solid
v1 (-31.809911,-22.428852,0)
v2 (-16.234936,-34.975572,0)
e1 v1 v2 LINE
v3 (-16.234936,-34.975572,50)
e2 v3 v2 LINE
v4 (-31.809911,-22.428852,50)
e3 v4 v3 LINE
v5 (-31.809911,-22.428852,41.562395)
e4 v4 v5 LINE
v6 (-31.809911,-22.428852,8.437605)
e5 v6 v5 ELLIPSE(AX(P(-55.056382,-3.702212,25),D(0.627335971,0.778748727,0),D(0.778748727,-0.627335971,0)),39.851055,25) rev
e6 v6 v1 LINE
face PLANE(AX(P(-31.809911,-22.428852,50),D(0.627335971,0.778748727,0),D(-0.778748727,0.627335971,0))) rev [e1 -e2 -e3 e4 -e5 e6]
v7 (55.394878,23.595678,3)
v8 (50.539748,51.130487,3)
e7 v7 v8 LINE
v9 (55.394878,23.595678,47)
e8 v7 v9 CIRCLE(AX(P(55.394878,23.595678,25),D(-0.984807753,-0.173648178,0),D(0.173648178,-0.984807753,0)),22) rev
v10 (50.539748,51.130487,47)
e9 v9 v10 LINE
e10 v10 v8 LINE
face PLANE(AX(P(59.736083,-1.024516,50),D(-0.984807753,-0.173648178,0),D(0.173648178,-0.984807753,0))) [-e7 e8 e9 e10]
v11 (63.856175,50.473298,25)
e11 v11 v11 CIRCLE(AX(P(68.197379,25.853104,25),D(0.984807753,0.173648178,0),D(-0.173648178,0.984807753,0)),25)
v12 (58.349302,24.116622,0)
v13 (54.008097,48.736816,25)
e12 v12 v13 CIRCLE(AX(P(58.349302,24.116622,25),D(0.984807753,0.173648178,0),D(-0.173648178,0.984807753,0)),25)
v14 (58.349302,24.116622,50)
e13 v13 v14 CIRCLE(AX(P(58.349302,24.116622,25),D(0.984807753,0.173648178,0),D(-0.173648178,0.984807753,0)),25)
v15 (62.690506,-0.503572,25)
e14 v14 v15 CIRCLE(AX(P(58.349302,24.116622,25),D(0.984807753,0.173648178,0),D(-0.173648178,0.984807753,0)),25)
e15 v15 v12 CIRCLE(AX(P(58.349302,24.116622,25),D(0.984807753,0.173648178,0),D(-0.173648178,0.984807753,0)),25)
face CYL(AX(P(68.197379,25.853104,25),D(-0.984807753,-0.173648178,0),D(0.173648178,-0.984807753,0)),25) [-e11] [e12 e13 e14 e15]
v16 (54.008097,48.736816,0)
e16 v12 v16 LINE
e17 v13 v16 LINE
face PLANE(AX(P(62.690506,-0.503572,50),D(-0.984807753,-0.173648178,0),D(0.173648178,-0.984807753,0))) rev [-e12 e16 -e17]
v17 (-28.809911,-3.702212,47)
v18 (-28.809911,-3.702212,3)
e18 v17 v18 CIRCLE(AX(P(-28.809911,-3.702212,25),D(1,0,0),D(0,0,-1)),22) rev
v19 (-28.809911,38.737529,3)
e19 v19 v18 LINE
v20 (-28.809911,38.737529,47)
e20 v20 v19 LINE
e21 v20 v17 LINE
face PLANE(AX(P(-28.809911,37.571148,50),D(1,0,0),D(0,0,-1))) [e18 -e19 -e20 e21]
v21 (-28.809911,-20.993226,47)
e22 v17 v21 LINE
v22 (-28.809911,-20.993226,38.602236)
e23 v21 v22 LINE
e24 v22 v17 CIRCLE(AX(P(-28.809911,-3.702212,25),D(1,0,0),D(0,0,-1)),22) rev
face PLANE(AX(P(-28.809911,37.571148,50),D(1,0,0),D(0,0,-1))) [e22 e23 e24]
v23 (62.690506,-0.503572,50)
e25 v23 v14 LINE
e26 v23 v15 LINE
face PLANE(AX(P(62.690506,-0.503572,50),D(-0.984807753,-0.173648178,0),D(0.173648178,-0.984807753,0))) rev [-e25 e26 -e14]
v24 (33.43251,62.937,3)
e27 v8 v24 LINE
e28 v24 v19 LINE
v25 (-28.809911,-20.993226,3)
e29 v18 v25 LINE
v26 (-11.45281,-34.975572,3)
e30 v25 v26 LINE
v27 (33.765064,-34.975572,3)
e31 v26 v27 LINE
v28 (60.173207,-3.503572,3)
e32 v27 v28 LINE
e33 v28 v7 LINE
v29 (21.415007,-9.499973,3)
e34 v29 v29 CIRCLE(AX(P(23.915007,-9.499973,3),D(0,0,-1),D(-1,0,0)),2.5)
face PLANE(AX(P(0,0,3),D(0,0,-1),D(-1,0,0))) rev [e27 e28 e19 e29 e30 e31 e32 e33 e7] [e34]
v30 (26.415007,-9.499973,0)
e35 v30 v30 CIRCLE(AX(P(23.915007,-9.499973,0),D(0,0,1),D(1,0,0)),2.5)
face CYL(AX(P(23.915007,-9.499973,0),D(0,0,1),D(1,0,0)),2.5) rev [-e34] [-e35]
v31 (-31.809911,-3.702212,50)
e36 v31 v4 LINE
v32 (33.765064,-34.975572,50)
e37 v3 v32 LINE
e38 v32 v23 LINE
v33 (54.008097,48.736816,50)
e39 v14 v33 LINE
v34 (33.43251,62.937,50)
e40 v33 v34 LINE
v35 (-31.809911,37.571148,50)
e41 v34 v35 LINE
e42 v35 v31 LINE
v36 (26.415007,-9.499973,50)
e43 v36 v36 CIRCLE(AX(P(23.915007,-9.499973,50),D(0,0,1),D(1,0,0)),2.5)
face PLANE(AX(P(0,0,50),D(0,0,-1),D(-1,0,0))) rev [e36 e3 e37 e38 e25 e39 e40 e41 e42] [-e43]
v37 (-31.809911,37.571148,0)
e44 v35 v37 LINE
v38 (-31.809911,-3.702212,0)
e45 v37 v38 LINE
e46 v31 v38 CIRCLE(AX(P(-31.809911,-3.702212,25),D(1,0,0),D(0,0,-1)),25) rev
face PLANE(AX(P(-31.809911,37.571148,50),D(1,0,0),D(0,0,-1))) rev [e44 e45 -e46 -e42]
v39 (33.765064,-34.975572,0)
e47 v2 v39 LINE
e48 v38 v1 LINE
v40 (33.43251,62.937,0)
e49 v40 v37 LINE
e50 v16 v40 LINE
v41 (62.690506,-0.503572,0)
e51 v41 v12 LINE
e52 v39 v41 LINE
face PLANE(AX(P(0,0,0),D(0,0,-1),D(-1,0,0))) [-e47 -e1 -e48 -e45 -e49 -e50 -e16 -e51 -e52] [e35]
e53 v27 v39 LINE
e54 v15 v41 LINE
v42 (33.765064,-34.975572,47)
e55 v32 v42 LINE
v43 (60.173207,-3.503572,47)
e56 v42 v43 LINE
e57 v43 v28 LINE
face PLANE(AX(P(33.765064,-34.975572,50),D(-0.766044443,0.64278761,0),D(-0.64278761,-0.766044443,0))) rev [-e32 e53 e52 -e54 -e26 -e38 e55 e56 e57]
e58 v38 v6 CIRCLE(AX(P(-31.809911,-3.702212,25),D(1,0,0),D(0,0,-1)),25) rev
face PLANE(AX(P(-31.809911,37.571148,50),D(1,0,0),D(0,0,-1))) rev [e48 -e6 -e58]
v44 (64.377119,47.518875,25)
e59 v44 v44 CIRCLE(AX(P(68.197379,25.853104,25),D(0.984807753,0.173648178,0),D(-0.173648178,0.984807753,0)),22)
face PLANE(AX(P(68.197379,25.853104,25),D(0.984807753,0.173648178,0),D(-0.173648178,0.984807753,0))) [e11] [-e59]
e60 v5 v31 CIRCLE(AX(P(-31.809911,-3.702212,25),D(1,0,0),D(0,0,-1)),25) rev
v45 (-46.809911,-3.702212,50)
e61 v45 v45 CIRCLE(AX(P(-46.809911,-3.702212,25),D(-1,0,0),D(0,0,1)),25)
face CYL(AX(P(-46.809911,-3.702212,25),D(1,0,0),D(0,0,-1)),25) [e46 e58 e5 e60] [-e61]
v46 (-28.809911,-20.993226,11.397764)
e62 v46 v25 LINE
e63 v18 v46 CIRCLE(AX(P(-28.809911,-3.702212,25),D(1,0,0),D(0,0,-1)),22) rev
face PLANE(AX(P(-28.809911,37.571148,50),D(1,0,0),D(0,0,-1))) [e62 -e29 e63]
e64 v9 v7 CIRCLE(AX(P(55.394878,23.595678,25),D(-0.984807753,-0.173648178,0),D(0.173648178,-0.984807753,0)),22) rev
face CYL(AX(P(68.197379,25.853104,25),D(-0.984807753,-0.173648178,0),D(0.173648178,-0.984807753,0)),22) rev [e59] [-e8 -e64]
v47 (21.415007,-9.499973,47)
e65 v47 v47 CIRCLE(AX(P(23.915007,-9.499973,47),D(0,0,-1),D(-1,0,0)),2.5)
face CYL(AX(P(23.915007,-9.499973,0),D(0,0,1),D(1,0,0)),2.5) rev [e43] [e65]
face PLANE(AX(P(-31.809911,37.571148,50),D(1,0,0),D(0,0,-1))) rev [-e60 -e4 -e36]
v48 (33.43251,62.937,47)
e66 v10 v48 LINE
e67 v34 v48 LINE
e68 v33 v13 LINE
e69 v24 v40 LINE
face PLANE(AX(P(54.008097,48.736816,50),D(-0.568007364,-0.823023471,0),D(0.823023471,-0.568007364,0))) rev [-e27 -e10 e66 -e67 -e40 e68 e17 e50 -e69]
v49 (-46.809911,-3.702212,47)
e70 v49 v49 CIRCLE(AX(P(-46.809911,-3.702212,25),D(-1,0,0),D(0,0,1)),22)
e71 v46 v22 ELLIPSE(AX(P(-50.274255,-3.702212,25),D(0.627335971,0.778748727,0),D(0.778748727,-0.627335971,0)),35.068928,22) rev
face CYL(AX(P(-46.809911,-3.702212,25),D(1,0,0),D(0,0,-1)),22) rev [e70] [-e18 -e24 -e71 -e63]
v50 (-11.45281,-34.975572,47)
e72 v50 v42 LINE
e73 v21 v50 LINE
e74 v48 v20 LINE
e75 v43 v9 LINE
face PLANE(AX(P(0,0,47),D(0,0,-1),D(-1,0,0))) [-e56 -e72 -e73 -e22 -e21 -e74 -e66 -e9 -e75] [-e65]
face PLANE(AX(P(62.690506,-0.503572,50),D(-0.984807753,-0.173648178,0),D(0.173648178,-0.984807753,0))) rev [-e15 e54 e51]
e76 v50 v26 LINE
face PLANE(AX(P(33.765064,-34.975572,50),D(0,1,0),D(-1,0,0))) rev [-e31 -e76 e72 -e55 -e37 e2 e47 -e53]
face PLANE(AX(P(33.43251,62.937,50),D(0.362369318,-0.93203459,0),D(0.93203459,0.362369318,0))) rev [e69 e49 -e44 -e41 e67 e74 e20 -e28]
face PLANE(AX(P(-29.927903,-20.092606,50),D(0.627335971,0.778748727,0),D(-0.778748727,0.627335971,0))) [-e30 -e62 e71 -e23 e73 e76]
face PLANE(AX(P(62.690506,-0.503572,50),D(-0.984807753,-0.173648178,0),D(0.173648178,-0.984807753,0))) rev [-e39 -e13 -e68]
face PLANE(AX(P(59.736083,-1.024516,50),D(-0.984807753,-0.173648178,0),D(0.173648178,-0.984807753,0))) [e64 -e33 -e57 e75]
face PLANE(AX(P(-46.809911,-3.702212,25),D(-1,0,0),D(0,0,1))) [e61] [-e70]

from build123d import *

# Parameters (mm, degrees)
BOSS_EXTRU_1_DEPTH      = 50
ESQUISSE3_R             = 25
BOSS_EXTRU_2_DEPTH      = 10
ESQUISSE4_R             = 25
BOSS_EXTRU_3_DEPTH      = 15
COQUE2_START            = 3
COQUE2_DEPTH            = 44
ESQUISSE6_R             = 2.5
ENL_V_MAT_EXTRU_1_DEPTH = 109.272397717


with BuildPart() as part:
    # Esquisse1 → Boss.-Extru.1 (new body)
    with BuildSketch(Plane.XY):
        Polygon((-31.809910954, -22.428852102), (-16.234936413, -34.975571516), (33.765063587, -34.975571516), (62.690506023, -0.503571576), (54.008097139, 48.736816075), (33.432510355, 62.937000175), (-31.809910954, 37.571147898), align=None)
    extrude(amount=BOSS_EXTRU_1_DEPTH)

    # Esquisse3 → Boss.-Extru.2 (add)
    with BuildSketch(Plane(origin=(60.714040151, 10.705523386, 0), x_dir=(0, 0, -1), z_dir=(0.9848077530122085, 0.17364817766692822, 0))):
        with Locations(Location((-25, 13.61798668, 0), (0, 0, 90))):
            Circle(ESQUISSE3_R)
    extrude(amount=BOSS_EXTRU_2_DEPTH)

    # Esquisse4 → Boss.-Extru.3 (add, symmetric)
    with BuildSketch(Plane.ZY.offset(31.809910954)):
        with Locations((25, -3.702211809)):
            Circle(ESQUISSE4_R)
    extrude(amount=BOSS_EXTRU_3_DEPTH, both=True)

    # Coque2: read off the stored shape, not the designer's step
    # Coque2 outline → Coque2 (cut)
    with BuildSketch(Plane.XY.offset(COQUE2_START)):
        Polygon((-28.809910954, 38.737529453), (-28.809910954, -20.993225887), (-11.452809865, -34.975571516), (33.765063587, -34.975571516), (60.173207129, -3.503571576), (55.394878322, 23.595677716), (50.539748489, 51.130487267), (33.432510355, 62.937000175), align=None)
    extrude(amount=COQUE2_DEPTH, mode=Mode.SUBTRACT)

    # Coque2 2: loft between two sections, ruled curve by curve
    coque2_2_from = [
        Edge.make_three_point_arc((68.197379111, 25.853104026, 3), (72.01763902, 4.18733346, 25), (68.197379111, 25.853104026, 47)),
        Edge.make_three_point_arc((68.197379111, 25.853104026, 47), (64.377119202, 47.518874592, 25), (68.197379111, 25.853104026, 3)),
    ]
    coque2_2_to = [
        Edge.make_three_point_arc((55.394878322, 23.595677716, 3), (59.21513823, 1.92990715, 25), (55.394878322, 23.595677716, 47)),
        Edge.make_three_point_arc((55.394878322, 23.595677716, 47), (51.574618413, 45.261448283, 25), (55.394878322, 23.595677716, 3)),
    ]
    coque2_2 = Solid(Shell([*[Face.make_surface_from_curves(coque2_2_from[k], coque2_2_to[k]) for k in range(2)], Face(Wire(coque2_2_from)), Face(Wire(coque2_2_to))]))
    add(coque2_2, mode=Mode.SUBTRACT)

    # Coque2 3: loft between two sections, ruled curve by curve
    coque2_3_from = [
        Edge.make_three_point_arc((-46.809910954, -3.702211809, 47), (-46.809910954, -25.702211809, 25), (-46.809910954, -3.702211809, 3)),
        Edge.make_three_point_arc((-46.809910954, -3.702211809, 3), (-46.809910954, 18.297788191, 25), (-46.809910954, -3.702211809, 47)),
    ]
    coque2_3_to = [
        Edge.make_three_point_arc((-22.947653862, -3.702211809, 47), (-22.947653862, -25.702211809, 25), (-22.947653862, -3.702211809, 3)),
        Edge.make_three_point_arc((-22.947653862, -3.702211809, 3), (-22.947653862, 18.297788191, 25), (-22.947653862, -3.702211809, 47)),
    ]
    coque2_3 = Solid(Shell([*[Face.make_surface_from_curves(coque2_3_from[k], coque2_3_to[k]) for k in range(2)], Face(Wire(coque2_3_from)), Face(Wire(coque2_3_to))]))
    add(coque2_3, mode=Mode.SUBTRACT)

    # Esquisse6 → Enlèv. mat.-Extru.1 (cut, through all)
    with BuildSketch(Plane.XY.offset(50)):
        with Locations((23.91500674, -9.499973142)):
            Circle(ESQUISSE6_R)
    extrude(amount=-ENL_V_MAT_EXTRU_1_DEPTH, mode=Mode.SUBTRACT)


solid = part.part
